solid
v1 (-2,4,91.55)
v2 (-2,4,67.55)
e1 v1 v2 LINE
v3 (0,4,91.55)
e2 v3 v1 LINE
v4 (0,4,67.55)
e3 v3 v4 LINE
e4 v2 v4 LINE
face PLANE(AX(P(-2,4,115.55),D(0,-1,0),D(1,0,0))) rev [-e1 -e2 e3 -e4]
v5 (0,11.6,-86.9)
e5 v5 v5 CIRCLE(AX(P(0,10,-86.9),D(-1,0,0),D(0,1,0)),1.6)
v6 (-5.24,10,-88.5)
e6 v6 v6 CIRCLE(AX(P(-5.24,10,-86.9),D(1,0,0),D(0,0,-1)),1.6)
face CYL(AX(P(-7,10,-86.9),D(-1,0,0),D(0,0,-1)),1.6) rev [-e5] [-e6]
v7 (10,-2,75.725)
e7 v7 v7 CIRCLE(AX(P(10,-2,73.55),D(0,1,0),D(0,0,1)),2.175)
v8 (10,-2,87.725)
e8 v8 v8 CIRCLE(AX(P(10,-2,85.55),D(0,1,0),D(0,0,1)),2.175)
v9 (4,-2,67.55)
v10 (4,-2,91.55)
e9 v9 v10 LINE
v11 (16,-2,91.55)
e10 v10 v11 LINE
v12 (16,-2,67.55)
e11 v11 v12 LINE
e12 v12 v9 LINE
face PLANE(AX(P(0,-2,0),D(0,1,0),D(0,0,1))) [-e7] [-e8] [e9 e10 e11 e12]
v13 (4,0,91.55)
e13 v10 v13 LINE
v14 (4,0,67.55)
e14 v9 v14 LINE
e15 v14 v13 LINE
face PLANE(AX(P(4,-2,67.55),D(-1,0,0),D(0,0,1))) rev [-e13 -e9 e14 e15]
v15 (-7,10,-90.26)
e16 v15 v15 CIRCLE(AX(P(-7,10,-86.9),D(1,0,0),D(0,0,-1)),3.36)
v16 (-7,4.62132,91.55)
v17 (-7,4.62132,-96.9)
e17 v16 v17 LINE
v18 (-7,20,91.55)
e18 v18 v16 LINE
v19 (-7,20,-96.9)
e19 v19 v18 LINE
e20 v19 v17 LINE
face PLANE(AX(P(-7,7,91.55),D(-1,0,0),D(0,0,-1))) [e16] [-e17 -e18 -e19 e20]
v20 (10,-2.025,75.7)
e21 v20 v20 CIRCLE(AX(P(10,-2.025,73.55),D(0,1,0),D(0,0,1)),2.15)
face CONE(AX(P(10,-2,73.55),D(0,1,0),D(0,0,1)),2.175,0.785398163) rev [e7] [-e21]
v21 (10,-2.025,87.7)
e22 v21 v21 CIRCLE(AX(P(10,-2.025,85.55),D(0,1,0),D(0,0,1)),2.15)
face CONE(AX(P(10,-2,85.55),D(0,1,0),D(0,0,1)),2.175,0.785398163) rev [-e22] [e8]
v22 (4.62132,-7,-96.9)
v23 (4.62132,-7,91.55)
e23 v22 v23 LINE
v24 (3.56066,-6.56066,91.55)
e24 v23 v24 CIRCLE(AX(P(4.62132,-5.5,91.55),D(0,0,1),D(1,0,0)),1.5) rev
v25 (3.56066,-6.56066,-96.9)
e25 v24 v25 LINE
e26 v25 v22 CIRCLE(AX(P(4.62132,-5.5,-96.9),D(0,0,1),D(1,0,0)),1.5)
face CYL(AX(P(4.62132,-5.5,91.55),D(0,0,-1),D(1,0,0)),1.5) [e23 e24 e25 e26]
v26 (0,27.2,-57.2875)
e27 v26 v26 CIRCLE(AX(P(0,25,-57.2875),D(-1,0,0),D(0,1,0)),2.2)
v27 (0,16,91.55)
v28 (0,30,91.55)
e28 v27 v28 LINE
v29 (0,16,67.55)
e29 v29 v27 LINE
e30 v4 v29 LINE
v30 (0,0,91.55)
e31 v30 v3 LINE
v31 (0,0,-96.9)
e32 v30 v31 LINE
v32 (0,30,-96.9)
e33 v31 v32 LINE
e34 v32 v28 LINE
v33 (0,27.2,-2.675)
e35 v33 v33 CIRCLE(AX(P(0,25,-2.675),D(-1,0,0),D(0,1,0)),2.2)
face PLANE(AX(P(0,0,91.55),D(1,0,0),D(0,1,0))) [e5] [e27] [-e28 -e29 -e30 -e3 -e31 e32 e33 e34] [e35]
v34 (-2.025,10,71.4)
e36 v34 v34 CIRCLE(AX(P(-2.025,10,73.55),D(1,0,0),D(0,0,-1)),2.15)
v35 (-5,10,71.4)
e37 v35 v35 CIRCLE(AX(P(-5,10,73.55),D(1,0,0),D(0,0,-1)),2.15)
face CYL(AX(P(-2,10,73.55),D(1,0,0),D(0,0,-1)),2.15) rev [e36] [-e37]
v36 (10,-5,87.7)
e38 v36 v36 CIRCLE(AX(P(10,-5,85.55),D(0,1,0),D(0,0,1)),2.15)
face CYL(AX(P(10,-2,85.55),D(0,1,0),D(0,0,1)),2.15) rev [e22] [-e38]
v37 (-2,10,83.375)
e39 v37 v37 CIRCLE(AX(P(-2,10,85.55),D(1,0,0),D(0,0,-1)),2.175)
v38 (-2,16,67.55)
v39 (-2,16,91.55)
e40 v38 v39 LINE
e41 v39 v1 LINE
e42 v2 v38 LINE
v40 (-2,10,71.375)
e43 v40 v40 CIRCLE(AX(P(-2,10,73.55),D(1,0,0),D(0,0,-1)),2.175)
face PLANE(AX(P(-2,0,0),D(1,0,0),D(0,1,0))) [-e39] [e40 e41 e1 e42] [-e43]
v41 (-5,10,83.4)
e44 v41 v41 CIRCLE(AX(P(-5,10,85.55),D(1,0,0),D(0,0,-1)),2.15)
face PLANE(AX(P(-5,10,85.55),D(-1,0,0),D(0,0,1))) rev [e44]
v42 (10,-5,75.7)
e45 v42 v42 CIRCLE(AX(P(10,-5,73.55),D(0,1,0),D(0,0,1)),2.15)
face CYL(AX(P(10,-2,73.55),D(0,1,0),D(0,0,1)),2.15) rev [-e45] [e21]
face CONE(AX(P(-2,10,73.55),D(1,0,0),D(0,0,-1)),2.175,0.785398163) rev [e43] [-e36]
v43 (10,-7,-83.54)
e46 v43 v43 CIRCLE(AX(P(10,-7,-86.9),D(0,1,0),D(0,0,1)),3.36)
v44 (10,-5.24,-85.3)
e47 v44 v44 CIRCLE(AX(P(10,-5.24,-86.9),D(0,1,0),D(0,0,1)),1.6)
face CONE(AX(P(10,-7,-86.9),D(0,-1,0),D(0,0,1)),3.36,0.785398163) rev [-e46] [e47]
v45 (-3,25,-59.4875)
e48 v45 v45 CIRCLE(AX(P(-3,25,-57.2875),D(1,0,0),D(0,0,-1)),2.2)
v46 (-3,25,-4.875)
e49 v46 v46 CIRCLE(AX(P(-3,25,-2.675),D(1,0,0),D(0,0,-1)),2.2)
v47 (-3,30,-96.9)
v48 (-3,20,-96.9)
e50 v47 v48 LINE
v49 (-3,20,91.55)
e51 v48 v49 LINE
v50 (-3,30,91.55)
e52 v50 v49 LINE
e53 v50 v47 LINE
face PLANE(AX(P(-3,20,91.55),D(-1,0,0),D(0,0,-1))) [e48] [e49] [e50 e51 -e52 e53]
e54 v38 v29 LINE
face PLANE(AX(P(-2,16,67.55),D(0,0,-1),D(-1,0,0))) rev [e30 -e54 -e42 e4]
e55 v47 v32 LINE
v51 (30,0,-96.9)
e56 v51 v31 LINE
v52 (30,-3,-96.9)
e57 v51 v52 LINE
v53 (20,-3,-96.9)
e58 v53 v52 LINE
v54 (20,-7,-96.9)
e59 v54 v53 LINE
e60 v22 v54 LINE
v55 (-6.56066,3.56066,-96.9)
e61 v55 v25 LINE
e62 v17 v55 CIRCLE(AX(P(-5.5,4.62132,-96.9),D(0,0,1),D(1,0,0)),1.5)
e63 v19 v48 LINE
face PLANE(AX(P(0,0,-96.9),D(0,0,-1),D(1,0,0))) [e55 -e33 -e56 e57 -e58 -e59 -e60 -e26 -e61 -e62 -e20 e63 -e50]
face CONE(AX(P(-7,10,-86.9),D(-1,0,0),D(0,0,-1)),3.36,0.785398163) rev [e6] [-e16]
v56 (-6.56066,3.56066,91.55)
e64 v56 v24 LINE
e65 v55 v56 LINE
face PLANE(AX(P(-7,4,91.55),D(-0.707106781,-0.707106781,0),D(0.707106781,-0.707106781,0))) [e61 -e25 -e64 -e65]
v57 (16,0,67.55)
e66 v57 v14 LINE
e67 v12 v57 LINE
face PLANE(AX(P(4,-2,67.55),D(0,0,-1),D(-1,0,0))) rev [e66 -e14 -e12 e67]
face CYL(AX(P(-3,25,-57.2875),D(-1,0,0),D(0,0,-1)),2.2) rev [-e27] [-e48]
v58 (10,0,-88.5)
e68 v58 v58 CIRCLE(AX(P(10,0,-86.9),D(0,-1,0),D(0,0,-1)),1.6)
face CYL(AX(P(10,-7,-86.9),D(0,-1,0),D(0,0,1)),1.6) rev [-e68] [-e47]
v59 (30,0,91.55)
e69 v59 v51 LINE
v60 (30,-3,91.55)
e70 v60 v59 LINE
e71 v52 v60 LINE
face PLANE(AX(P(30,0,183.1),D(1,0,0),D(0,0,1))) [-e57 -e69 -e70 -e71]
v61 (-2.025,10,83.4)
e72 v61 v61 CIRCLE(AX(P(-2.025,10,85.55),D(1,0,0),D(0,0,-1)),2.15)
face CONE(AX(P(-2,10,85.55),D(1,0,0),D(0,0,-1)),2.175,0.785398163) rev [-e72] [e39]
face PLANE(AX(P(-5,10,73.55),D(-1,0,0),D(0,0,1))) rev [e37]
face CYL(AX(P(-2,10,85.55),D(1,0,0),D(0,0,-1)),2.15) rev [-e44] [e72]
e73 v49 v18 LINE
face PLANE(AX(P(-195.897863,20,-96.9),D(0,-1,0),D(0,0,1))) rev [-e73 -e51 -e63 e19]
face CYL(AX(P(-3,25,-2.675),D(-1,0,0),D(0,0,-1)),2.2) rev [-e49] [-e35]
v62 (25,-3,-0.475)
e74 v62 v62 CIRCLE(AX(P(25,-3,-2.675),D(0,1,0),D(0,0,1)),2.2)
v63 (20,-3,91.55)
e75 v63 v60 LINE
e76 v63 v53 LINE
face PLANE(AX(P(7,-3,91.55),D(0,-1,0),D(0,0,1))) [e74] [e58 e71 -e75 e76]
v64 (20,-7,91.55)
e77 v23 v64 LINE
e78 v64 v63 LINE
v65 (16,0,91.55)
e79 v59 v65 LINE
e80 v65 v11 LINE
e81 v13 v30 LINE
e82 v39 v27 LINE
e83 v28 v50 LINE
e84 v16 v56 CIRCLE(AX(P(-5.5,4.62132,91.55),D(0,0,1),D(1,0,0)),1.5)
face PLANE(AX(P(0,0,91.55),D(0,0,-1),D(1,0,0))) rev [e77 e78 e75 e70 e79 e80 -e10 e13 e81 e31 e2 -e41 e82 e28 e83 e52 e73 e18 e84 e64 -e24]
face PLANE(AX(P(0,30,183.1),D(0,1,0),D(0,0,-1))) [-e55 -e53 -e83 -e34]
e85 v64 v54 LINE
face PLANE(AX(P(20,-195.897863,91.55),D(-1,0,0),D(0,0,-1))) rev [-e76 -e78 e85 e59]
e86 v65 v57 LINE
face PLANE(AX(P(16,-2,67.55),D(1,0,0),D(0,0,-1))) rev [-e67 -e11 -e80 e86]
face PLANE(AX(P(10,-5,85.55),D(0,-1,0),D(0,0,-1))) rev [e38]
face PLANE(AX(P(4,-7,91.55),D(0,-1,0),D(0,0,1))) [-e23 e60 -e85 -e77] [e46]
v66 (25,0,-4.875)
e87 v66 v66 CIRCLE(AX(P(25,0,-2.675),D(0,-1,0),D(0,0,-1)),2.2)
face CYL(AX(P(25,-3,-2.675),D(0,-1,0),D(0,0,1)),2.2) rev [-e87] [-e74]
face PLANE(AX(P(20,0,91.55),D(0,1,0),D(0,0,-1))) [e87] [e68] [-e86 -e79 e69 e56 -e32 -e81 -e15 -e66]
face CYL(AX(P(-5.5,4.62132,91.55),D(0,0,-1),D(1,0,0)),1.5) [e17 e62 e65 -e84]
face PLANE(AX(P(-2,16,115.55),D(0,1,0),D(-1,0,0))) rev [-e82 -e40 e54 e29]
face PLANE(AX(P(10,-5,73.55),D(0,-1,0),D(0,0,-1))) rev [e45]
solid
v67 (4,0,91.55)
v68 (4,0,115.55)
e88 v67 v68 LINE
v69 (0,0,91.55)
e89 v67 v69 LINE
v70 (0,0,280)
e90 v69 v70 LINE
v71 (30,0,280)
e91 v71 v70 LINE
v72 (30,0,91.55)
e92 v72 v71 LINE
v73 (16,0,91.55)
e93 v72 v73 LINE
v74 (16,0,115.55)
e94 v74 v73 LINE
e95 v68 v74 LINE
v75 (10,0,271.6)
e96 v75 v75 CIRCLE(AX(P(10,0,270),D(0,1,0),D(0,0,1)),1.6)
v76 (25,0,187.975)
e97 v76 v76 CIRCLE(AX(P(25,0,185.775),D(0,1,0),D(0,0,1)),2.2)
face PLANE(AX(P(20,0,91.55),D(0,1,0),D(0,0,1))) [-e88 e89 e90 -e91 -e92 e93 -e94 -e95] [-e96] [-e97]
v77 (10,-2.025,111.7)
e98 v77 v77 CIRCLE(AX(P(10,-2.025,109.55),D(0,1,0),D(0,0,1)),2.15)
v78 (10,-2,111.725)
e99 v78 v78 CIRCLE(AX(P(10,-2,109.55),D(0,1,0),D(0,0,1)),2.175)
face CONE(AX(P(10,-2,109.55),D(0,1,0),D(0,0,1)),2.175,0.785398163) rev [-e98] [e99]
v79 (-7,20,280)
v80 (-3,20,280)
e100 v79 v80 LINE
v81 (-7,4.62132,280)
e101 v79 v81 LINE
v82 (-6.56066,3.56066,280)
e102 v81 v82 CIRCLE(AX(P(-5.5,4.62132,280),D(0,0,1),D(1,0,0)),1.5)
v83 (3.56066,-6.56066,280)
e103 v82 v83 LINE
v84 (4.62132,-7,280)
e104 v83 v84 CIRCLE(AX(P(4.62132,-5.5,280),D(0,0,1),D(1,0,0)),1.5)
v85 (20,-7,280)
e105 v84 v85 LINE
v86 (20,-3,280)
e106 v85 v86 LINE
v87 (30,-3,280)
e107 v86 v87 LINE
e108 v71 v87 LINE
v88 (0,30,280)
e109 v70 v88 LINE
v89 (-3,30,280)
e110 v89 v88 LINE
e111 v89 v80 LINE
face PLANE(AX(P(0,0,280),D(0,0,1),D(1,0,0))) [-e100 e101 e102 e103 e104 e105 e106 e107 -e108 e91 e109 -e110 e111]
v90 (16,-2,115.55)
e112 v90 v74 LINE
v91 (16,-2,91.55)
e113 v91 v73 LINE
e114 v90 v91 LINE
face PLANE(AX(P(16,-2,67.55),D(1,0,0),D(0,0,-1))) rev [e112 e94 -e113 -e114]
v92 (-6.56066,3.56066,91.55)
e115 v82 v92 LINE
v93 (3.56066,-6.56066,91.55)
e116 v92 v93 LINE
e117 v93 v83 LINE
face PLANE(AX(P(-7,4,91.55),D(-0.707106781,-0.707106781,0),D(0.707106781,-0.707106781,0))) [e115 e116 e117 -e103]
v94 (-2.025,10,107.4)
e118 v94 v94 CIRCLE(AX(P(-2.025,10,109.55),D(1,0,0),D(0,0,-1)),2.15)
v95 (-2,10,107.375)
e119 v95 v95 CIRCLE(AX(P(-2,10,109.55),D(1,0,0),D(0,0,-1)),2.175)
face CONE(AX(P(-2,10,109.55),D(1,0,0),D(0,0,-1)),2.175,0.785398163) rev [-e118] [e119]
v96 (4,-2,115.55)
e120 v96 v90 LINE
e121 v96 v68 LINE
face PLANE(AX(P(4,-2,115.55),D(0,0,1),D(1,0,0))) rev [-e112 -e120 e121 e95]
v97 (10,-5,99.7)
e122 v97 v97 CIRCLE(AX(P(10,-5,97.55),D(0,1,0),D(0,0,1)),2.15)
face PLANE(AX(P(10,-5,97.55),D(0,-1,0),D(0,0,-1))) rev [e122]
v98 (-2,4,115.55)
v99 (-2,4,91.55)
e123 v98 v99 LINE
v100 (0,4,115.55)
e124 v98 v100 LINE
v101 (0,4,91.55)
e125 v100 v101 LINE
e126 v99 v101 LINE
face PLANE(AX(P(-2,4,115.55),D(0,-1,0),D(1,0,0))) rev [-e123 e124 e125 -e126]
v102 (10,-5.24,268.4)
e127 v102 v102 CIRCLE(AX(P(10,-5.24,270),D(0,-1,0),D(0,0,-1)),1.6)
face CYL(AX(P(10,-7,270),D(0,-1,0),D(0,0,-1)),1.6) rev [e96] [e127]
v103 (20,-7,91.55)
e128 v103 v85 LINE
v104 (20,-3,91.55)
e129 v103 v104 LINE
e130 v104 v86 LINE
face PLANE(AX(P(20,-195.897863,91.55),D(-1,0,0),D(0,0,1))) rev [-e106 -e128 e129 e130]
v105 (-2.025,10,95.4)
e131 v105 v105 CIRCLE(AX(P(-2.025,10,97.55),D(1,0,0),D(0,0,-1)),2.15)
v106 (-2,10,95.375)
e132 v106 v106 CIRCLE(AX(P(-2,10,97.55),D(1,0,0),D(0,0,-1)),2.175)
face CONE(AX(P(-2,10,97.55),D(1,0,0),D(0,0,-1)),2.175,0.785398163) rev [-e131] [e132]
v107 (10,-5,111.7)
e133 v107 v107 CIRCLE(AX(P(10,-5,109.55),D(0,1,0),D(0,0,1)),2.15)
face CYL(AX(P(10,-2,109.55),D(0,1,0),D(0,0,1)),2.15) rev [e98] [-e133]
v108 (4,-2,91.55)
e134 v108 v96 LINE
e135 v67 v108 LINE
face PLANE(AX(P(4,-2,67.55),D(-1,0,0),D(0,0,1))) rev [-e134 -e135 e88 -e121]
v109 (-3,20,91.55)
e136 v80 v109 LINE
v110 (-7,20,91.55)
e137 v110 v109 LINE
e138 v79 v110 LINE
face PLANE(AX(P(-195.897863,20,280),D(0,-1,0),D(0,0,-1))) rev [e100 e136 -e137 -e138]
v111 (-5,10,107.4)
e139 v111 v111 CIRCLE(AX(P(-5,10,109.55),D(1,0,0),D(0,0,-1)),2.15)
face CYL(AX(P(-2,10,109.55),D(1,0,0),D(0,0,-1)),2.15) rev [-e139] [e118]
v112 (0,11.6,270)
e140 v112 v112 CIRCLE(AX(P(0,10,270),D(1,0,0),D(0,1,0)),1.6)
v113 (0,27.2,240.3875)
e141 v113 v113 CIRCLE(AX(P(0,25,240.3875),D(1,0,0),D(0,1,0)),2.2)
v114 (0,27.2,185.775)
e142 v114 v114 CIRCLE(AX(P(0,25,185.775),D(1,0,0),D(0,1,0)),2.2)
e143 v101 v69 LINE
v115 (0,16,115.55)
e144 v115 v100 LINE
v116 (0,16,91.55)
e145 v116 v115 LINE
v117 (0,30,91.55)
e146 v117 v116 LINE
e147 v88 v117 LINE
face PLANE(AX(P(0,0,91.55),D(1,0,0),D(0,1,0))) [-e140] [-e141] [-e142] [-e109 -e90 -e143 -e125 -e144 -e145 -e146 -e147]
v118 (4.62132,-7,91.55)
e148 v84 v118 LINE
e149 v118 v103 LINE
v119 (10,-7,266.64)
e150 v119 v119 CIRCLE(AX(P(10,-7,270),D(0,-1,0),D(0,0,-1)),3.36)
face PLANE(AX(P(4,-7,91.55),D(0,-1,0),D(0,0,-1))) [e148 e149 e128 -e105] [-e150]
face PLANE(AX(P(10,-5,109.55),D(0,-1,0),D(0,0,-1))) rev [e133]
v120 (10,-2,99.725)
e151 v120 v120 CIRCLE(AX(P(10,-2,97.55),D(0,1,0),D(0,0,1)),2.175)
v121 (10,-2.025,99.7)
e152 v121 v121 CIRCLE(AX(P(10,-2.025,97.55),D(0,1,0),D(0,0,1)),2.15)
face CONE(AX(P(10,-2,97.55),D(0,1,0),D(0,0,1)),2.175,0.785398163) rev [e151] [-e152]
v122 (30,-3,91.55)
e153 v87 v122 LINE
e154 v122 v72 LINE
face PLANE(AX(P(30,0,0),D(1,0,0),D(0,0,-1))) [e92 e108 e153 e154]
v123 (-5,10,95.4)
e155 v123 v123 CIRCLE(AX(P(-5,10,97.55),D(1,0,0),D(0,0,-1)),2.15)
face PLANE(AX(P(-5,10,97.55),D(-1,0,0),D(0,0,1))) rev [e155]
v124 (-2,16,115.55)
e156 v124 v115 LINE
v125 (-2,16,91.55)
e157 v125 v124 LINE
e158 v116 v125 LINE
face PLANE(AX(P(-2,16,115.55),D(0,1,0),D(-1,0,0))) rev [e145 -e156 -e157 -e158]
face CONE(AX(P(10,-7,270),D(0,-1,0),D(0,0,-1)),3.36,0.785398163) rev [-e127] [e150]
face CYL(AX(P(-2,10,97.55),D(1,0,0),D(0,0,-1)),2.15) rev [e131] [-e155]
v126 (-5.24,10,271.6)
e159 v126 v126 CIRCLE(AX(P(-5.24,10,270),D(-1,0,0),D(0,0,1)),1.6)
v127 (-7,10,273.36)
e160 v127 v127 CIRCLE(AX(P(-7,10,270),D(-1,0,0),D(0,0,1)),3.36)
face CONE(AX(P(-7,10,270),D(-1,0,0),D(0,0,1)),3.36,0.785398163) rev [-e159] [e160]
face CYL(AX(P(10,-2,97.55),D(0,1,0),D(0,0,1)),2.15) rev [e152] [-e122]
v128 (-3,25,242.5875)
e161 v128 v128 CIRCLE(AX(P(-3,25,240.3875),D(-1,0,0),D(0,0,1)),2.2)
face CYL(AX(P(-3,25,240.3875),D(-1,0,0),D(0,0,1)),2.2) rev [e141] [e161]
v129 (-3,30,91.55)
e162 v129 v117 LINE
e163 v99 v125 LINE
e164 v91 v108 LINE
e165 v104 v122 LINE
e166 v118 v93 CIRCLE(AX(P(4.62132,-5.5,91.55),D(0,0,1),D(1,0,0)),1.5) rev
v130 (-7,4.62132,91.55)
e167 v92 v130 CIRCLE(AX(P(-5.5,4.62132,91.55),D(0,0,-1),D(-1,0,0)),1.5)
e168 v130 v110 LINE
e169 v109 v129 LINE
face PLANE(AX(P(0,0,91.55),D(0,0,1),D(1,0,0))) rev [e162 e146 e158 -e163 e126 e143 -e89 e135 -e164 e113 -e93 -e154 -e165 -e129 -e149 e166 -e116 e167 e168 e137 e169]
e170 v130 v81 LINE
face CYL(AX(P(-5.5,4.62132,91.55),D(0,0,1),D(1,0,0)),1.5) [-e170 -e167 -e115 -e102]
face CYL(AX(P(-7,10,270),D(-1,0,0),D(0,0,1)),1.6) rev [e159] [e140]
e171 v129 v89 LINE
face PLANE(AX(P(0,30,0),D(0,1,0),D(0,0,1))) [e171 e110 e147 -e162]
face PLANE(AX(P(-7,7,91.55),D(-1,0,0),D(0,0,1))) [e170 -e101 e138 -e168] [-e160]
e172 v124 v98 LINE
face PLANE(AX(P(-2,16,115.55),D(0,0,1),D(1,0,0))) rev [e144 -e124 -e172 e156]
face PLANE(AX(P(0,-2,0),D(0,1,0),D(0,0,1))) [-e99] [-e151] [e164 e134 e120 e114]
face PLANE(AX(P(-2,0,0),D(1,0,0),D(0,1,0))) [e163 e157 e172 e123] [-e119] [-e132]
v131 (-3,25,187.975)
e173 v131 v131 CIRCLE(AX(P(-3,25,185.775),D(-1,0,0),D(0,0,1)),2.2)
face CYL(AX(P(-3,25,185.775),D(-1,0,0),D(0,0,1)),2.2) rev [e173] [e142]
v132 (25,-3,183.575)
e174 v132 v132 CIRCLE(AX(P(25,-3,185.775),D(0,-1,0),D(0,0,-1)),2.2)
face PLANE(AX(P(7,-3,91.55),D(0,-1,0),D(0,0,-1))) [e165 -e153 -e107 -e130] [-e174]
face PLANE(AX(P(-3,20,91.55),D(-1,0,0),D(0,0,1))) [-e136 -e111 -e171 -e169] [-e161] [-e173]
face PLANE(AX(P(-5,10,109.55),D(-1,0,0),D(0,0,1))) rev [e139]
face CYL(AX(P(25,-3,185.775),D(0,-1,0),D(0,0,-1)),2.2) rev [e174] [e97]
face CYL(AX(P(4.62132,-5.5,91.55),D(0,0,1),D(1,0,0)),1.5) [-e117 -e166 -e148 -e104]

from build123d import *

# Parameters (mm, degrees)
BOSS_EXTRUDE1_DEPTH            = 188.45
SKETCH6_W                      = 188.45
SKETCH6_H                      = 3
BOSS_EXTRUDE2_DEPTH            = 10
SKETCH7_W                      = 13
SKETCH7_H                      = 188.45
BOSS_EXTRUDE3_DEPTH            = 4
SKETCH8_W                      = 3
SKETCH8_H                      = 188.45
BOSS_EXTRUDE4_DEPTH            = 10
SKETCH9_W                      = 188.45
SKETCH9_H                      = 13
BOSS_EXTRUDE5_DEPTH            = 4
CSK_FOR_M3_SFHCS1_D            = 3.2
CSK_FOR_M3_SFHCS1_CSINK_D      = 6.72
CSK_FOR_M3_SFHCS1_CSINK_ANGLE  = 90
CSK_FOR_M3_SFHCS2_D            = 3.2
CSK_FOR_M3_SFHCS2_CSINK_D      = 6.72
CSK_FOR_M3_SFHCS2_CSINK_ANGLE  = 90
F_4_4_4_4_DIAMETER_HOLE1_D     = 4.4
F_4_4_4_4_DIAMETER_HOLE1_DEPTH = 10
F_4_4_4_4_DIAMETER_HOLE1_TIP   = 1.321893362
F_4_4_4_4_DIAMETER_HOLE2_D     = 4.4
F_4_4_4_4_DIAMETER_HOLE2_DEPTH = 10
F_4_4_4_4_DIAMETER_HOLE2_TIP   = 1.321893362
SKETCH14_W                     = 50
SKETCH14_H                     = 30
CUT_EXTRUDE1_DEPTH             = 10
FILLET1_R                      = 1.5
BOSS_EXTRUDE7_DEPTH            = 100
BOSS_EXTRUDE8_DEPTH            = 50
BOSS_EXTRUDE9_DEPTH            = 50
SKETCH23_W                     = 48
SKETCH23_H                     = 12
CUT_EXTRUDE2_DEPTH             = 2
SKETCH26_W                     = 12
SKETCH26_H                     = 48
CUT_EXTRUDE3_DEPTH             = 2


with BuildPart() as part:
    # Sketch1 → Boss-Extrude1 (new body)
    with BuildSketch(Plane.XY.offset(280)):
        Polygon((-7, 4), (4, -7), (7, -7), (7, -3), (20, -3), (20, 0), (0, 0), (0, 20), (-3, 20), (-3, 7), (-7, 7), align=None)
    extrude(amount=-BOSS_EXTRUDE1_DEPTH)

    # Sketch6 → Boss-Extrude2 (add)
    with BuildSketch(Plane(origin=(20, 0, 0), x_dir=(0, 0, -1), z_dir=(1, 0, 0))):
        with Locations((-185.775, -1.5)):
            Rectangle(SKETCH6_W, SKETCH6_H)
    extrude(amount=BOSS_EXTRUDE2_DEPTH)

    # Sketch7 → Boss-Extrude3 (add)
    with BuildSketch(Plane.XZ.offset(3)):
        with Locations((13.5, 185.775)):
            Rectangle(SKETCH7_W, SKETCH7_H)
    extrude(amount=BOSS_EXTRUDE3_DEPTH)

    # Sketch8 → Boss-Extrude4 (add)
    with BuildSketch(Plane(origin=(0, 20, 0), x_dir=(1, 0, 0), z_dir=(0, 1, 0))):
        with Locations((-1.5, -185.775)):
            Rectangle(SKETCH8_W, SKETCH8_H)
    extrude(amount=BOSS_EXTRUDE4_DEPTH)

    # Sketch9 → Boss-Extrude5 (add)
    with BuildSketch(Plane.ZY.offset(3)):
        with Locations((185.775, 13.5)):
            Rectangle(SKETCH9_W, SKETCH9_H)
    extrude(amount=BOSS_EXTRUDE5_DEPTH)

    # CSK for M3 SFHCS1 (through all)
    with Locations(Plane.XZ.offset(7)):
        with Locations((10, 270)):
            CounterSinkHole(CSK_FOR_M3_SFHCS1_D / 2, CSK_FOR_M3_SFHCS1_CSINK_D / 2, counter_sink_angle=CSK_FOR_M3_SFHCS1_CSINK_ANGLE)

    # CSK for M3 SFHCS2 (through all)
    with Locations(Plane.ZY.offset(7)):
        with Locations((270, 10)):
            CounterSinkHole(CSK_FOR_M3_SFHCS2_D / 2, CSK_FOR_M3_SFHCS2_CSINK_D / 2, counter_sink_angle=CSK_FOR_M3_SFHCS2_CSINK_ANGLE)

    # Ø4.4 (4.4) Diameter Hole1
    with Locations(Plane.ZY.offset(3)):
        with Locations((138.6625, 25), (185.775, 25), (240.3875, 25)):
            Hole(F_4_4_4_4_DIAMETER_HOLE1_D / 2, depth=F_4_4_4_4_DIAMETER_HOLE1_DEPTH)
            with Locations((0, 0, -(F_4_4_4_4_DIAMETER_HOLE1_DEPTH + F_4_4_4_4_DIAMETER_HOLE1_TIP / 2))):  # 118° drill point
                Cone(0, F_4_4_4_4_DIAMETER_HOLE1_D / 2, F_4_4_4_4_DIAMETER_HOLE1_TIP, mode=Mode.SUBTRACT)

    # Ø4.4 (4.4) Diameter Hole2
    with Locations(Plane.XZ.offset(3)):
        with Locations((25, 185.775)):
            Hole(F_4_4_4_4_DIAMETER_HOLE2_D / 2, depth=F_4_4_4_4_DIAMETER_HOLE2_DEPTH)
            with Locations((0, 0, -(F_4_4_4_4_DIAMETER_HOLE2_DEPTH + F_4_4_4_4_DIAMETER_HOLE2_TIP / 2))):  # 118° drill point
                Cone(0, F_4_4_4_4_DIAMETER_HOLE2_D / 2, F_4_4_4_4_DIAMETER_HOLE2_TIP, mode=Mode.SUBTRACT)

    # Sketch14 → Cut-Extrude1 (cut)
    with BuildSketch(Plane.ZY.offset(7)):
        with Locations((116.55, 15)):
            Rectangle(SKETCH14_W, SKETCH14_H)
    extrude(amount=-CUT_EXTRUDE1_DEPTH, mode=Mode.SUBTRACT)

    # Fillet1
    fillet1_edges = [part.edges().sort_by_distance(p)[0] for p in [
        (-7, 4, 210.775),
        (4, -7, 185.775),
    ]]
    fillet(fillet1_edges, radius=FILLET1_R)


with BuildPart() as body_2:
    # Mirror1: read off the stored shape, not the designer's step
    # Mirror1: mirrored copy
    add(part.part.mirror(Plane.XY.offset(91.55)))

    # Sketch22 → Boss-Extrude9 (add)
    with BuildSketch(Plane.XY.offset(41.55)):
        with BuildLine():
            Line((-6.560660172, 3.560660172), (-3, 0))
            Line((-3, 0), (0, 0))
            Line((0, 0), (0, 30))
            Line((0, 30), (-3, 30))
            Line((-3, 30), (-3, 20))
            Line((-3, 20), (-7, 20))
            Line((-7, 20), (-7, 4.621320344))
            ThreePointArc((-7, 4.621320344), (-6.885819299, 4.047295195), (-6.560660172, 3.560660172))
        make_face()
    extrude(amount=BOSS_EXTRUDE9_DEPTH)


with BuildPart() as body_3:
    # Sketch19 → Boss-Extrude7 (new body)
    with BuildSketch(Plane(origin=(0, 0, 141.55), x_dir=(-1, 0, 0), z_dir=(0, 0, -1))):
        with BuildLine():
            Line((7, 20), (3, 20))
            Line((3, 20), (0, 20))
            Line((0, 20), (0, 0))
            Line((0, 0), (3, 0))
            Line((3, 0), (6.560660172, 3.560660172))
            ThreePointArc((6.560660172, 3.560660172), (6.885819299, 4.047295195), (7, 4.621320344))
            Line((7, 4.621320344), (7, 20))
        make_face()
    extrude(amount=BOSS_EXTRUDE7_DEPTH)


with BuildPart() as part_1:
    add(part.part)

    # Sketch20 → Boss-Extrude8 (add)
    with BuildSketch(Plane(origin=(0, 0, 141.55), x_dir=(-1, 0, 0), z_dir=(0, 0, -1))):
        with BuildLine():
            Line((3, 0), (6.560660172, 3.560660172))
            ThreePointArc((6.560660172, 3.560660172), (6.885819299, 4.047295195), (7, 4.621320344))
            Line((7, 4.621320344), (7, 20))
            Line((7, 20), (3, 20))
            Line((3, 20), (3, 30))
            Line((3, 30), (0, 30))
            Line((0, 30), (0, 0))
            Line((0, 0), (3, 0))
        make_face()
    extrude(amount=BOSS_EXTRUDE8_DEPTH)


with BuildPart() as cut_extrude2_tool:
    # Sketch23 → Cut-Extrude2 (new body)
    with BuildSketch(Plane(origin=(0, 0, 0), x_dir=(0, 0, -1), z_dir=(1, 0, 0))):
        with Locations((-91.55, 10)):
            Rectangle(SKETCH23_W, SKETCH23_H)
    extrude(amount=-CUT_EXTRUDE2_DEPTH)


with BuildPart() as part_2:
    add(part_1.part)

    # Cut-Extrude2: cut by cut_extrude2_tool
    add(cut_extrude2_tool.part, mode=Mode.SUBTRACT)

    # 4.3 _4.3_ Diameter Hole1 3 outline → 4.3 _4.3_ Diameter Hole1 3 (revolve, cut)
    with BuildSketch(Plane(origin=(0, 10, 109.55), x_dir=(0, 1, 0), z_dir=(0, 0, -1))):
        Polygon((0, -2), (0, -5), (2.15, -5), (2.15, -2.025), (2.175, -2), align=None)
    revolve(axis=Axis((0, 10, 109.55), (1, 0, 0)), mode=Mode.SUBTRACT)

    # 4.3 _4.3_ Diameter Hole1 4 outline → 4.3 _4.3_ Diameter Hole1 4 (revolve, cut)
    with BuildSketch(Plane(origin=(0, 10, 97.55), x_dir=(0, 1, 0), z_dir=(0, 0, -1))):
        Polygon((0, -2), (0, -5), (2.15, -5), (2.15, -2.025), (2.175, -2), align=None)
    revolve(axis=Axis((0, 10, 97.55), (1, 0, 0)), mode=Mode.SUBTRACT)


with BuildPart() as body_2_1:
    add(body_2.part)

    # Cut-Extrude2: cut by cut_extrude2_tool
    add(cut_extrude2_tool.part, mode=Mode.SUBTRACT)

    # Ø4.3 (4.3) Diameter Hole1: read off the stored shape, not the designer's step
    # Ø4.3 (4.3) Diameter Hole1 outline → Ø4.3 (4.3) Diameter Hole1 (revolve, cut)
    with BuildSketch(Plane(origin=(0, 10, 85.55), x_dir=(0, 1, 0), z_dir=(0, 0, -1))):
        Polygon((0, -2), (0, -5), (2.15, -5), (2.15, -2.025), (2.175, -2), align=None)
    revolve(axis=Axis((0, 10, 85.55), (1, 0, 0)), mode=Mode.SUBTRACT)

    # 4.3 _4.3_ Diameter Hole1 2 outline → 4.3 _4.3_ Diameter Hole1 2 (revolve, cut)
    with BuildSketch(Plane(origin=(0, 10, 73.55), x_dir=(0, 1, 0), z_dir=(0, 0, -1))):
        Polygon((0, -2), (0, -5), (2.15, -5), (2.15, -2.025), (2.175, -2), align=None)
    revolve(axis=Axis((0, 10, 73.55), (1, 0, 0)), mode=Mode.SUBTRACT)


with BuildPart() as cut_extrude3_tool:
    # Sketch26 → Cut-Extrude3 (new body)
    with BuildSketch(Plane(origin=(0, 0, 0), x_dir=(1, 0, 0), z_dir=(0, 1, 0))):
        with Locations((10, -91.55)):
            Rectangle(SKETCH26_W, SKETCH26_H)
    extrude(amount=-CUT_EXTRUDE3_DEPTH)


with BuildPart() as part_3:
    add(part_2.part)

    # Cut-Extrude3: cut by cut_extrude3_tool
    add(cut_extrude3_tool.part, mode=Mode.SUBTRACT)

    # 4.3 _4.3_ Diameter Hole2 3 outline → 4.3 _4.3_ Diameter Hole2 3 (revolve, cut)
    with BuildSketch(Plane(origin=(10, 0, 97.55), x_dir=(1, 0, 0), z_dir=(0, 0, 1))):
        Polygon((0, -2), (0, -5), (2.15, -5), (2.15, -2.025), (2.175, -2), align=None)
    revolve(axis=Axis((10, 0, 97.55), (0, 1, 0)), mode=Mode.SUBTRACT)

    # 4.3 _4.3_ Diameter Hole2 4 outline → 4.3 _4.3_ Diameter Hole2 4 (revolve, cut)
    with BuildSketch(Plane(origin=(10, 0, 109.55), x_dir=(1, 0, 0), z_dir=(0, 0, 1))):
        Polygon((0, -2), (0, -5), (2.15, -5), (2.15, -2.025), (2.175, -2), align=None)
    revolve(axis=Axis((10, 0, 109.55), (0, 1, 0)), mode=Mode.SUBTRACT)


with BuildPart() as body_2_2:
    add(body_2_1.part)

    # Cut-Extrude3: cut by cut_extrude3_tool
    add(cut_extrude3_tool.part, mode=Mode.SUBTRACT)

    # Ø4.3 (4.3) Diameter Hole2: read off the stored shape, not the designer's step
    # Ø4.3 (4.3) Diameter Hole2 outline → Ø4.3 (4.3) Diameter Hole2 (revolve, cut)
    with BuildSketch(Plane(origin=(10, 0, 73.55), x_dir=(1, 0, 0), z_dir=(0, 0, 1))):
        Polygon((0, -2), (0, -5), (2.15, -5), (2.15, -2.025), (2.175, -2), align=None)
    revolve(axis=Axis((10, 0, 73.55), (0, 1, 0)), mode=Mode.SUBTRACT)

    # 4.3 _4.3_ Diameter Hole2 2 outline → 4.3 _4.3_ Diameter Hole2 2 (revolve, cut)
    with BuildSketch(Plane(origin=(10, 0, 85.55), x_dir=(1, 0, 0), z_dir=(0, 0, 1))):
        Polygon((0, -2), (0, -5), (2.15, -5), (2.15, -2.025), (2.175, -2), align=None)
    revolve(axis=Axis((10, 0, 85.55), (0, 1, 0)), mode=Mode.SUBTRACT)


solid = Compound([part_3.part, body_2_2.part])
